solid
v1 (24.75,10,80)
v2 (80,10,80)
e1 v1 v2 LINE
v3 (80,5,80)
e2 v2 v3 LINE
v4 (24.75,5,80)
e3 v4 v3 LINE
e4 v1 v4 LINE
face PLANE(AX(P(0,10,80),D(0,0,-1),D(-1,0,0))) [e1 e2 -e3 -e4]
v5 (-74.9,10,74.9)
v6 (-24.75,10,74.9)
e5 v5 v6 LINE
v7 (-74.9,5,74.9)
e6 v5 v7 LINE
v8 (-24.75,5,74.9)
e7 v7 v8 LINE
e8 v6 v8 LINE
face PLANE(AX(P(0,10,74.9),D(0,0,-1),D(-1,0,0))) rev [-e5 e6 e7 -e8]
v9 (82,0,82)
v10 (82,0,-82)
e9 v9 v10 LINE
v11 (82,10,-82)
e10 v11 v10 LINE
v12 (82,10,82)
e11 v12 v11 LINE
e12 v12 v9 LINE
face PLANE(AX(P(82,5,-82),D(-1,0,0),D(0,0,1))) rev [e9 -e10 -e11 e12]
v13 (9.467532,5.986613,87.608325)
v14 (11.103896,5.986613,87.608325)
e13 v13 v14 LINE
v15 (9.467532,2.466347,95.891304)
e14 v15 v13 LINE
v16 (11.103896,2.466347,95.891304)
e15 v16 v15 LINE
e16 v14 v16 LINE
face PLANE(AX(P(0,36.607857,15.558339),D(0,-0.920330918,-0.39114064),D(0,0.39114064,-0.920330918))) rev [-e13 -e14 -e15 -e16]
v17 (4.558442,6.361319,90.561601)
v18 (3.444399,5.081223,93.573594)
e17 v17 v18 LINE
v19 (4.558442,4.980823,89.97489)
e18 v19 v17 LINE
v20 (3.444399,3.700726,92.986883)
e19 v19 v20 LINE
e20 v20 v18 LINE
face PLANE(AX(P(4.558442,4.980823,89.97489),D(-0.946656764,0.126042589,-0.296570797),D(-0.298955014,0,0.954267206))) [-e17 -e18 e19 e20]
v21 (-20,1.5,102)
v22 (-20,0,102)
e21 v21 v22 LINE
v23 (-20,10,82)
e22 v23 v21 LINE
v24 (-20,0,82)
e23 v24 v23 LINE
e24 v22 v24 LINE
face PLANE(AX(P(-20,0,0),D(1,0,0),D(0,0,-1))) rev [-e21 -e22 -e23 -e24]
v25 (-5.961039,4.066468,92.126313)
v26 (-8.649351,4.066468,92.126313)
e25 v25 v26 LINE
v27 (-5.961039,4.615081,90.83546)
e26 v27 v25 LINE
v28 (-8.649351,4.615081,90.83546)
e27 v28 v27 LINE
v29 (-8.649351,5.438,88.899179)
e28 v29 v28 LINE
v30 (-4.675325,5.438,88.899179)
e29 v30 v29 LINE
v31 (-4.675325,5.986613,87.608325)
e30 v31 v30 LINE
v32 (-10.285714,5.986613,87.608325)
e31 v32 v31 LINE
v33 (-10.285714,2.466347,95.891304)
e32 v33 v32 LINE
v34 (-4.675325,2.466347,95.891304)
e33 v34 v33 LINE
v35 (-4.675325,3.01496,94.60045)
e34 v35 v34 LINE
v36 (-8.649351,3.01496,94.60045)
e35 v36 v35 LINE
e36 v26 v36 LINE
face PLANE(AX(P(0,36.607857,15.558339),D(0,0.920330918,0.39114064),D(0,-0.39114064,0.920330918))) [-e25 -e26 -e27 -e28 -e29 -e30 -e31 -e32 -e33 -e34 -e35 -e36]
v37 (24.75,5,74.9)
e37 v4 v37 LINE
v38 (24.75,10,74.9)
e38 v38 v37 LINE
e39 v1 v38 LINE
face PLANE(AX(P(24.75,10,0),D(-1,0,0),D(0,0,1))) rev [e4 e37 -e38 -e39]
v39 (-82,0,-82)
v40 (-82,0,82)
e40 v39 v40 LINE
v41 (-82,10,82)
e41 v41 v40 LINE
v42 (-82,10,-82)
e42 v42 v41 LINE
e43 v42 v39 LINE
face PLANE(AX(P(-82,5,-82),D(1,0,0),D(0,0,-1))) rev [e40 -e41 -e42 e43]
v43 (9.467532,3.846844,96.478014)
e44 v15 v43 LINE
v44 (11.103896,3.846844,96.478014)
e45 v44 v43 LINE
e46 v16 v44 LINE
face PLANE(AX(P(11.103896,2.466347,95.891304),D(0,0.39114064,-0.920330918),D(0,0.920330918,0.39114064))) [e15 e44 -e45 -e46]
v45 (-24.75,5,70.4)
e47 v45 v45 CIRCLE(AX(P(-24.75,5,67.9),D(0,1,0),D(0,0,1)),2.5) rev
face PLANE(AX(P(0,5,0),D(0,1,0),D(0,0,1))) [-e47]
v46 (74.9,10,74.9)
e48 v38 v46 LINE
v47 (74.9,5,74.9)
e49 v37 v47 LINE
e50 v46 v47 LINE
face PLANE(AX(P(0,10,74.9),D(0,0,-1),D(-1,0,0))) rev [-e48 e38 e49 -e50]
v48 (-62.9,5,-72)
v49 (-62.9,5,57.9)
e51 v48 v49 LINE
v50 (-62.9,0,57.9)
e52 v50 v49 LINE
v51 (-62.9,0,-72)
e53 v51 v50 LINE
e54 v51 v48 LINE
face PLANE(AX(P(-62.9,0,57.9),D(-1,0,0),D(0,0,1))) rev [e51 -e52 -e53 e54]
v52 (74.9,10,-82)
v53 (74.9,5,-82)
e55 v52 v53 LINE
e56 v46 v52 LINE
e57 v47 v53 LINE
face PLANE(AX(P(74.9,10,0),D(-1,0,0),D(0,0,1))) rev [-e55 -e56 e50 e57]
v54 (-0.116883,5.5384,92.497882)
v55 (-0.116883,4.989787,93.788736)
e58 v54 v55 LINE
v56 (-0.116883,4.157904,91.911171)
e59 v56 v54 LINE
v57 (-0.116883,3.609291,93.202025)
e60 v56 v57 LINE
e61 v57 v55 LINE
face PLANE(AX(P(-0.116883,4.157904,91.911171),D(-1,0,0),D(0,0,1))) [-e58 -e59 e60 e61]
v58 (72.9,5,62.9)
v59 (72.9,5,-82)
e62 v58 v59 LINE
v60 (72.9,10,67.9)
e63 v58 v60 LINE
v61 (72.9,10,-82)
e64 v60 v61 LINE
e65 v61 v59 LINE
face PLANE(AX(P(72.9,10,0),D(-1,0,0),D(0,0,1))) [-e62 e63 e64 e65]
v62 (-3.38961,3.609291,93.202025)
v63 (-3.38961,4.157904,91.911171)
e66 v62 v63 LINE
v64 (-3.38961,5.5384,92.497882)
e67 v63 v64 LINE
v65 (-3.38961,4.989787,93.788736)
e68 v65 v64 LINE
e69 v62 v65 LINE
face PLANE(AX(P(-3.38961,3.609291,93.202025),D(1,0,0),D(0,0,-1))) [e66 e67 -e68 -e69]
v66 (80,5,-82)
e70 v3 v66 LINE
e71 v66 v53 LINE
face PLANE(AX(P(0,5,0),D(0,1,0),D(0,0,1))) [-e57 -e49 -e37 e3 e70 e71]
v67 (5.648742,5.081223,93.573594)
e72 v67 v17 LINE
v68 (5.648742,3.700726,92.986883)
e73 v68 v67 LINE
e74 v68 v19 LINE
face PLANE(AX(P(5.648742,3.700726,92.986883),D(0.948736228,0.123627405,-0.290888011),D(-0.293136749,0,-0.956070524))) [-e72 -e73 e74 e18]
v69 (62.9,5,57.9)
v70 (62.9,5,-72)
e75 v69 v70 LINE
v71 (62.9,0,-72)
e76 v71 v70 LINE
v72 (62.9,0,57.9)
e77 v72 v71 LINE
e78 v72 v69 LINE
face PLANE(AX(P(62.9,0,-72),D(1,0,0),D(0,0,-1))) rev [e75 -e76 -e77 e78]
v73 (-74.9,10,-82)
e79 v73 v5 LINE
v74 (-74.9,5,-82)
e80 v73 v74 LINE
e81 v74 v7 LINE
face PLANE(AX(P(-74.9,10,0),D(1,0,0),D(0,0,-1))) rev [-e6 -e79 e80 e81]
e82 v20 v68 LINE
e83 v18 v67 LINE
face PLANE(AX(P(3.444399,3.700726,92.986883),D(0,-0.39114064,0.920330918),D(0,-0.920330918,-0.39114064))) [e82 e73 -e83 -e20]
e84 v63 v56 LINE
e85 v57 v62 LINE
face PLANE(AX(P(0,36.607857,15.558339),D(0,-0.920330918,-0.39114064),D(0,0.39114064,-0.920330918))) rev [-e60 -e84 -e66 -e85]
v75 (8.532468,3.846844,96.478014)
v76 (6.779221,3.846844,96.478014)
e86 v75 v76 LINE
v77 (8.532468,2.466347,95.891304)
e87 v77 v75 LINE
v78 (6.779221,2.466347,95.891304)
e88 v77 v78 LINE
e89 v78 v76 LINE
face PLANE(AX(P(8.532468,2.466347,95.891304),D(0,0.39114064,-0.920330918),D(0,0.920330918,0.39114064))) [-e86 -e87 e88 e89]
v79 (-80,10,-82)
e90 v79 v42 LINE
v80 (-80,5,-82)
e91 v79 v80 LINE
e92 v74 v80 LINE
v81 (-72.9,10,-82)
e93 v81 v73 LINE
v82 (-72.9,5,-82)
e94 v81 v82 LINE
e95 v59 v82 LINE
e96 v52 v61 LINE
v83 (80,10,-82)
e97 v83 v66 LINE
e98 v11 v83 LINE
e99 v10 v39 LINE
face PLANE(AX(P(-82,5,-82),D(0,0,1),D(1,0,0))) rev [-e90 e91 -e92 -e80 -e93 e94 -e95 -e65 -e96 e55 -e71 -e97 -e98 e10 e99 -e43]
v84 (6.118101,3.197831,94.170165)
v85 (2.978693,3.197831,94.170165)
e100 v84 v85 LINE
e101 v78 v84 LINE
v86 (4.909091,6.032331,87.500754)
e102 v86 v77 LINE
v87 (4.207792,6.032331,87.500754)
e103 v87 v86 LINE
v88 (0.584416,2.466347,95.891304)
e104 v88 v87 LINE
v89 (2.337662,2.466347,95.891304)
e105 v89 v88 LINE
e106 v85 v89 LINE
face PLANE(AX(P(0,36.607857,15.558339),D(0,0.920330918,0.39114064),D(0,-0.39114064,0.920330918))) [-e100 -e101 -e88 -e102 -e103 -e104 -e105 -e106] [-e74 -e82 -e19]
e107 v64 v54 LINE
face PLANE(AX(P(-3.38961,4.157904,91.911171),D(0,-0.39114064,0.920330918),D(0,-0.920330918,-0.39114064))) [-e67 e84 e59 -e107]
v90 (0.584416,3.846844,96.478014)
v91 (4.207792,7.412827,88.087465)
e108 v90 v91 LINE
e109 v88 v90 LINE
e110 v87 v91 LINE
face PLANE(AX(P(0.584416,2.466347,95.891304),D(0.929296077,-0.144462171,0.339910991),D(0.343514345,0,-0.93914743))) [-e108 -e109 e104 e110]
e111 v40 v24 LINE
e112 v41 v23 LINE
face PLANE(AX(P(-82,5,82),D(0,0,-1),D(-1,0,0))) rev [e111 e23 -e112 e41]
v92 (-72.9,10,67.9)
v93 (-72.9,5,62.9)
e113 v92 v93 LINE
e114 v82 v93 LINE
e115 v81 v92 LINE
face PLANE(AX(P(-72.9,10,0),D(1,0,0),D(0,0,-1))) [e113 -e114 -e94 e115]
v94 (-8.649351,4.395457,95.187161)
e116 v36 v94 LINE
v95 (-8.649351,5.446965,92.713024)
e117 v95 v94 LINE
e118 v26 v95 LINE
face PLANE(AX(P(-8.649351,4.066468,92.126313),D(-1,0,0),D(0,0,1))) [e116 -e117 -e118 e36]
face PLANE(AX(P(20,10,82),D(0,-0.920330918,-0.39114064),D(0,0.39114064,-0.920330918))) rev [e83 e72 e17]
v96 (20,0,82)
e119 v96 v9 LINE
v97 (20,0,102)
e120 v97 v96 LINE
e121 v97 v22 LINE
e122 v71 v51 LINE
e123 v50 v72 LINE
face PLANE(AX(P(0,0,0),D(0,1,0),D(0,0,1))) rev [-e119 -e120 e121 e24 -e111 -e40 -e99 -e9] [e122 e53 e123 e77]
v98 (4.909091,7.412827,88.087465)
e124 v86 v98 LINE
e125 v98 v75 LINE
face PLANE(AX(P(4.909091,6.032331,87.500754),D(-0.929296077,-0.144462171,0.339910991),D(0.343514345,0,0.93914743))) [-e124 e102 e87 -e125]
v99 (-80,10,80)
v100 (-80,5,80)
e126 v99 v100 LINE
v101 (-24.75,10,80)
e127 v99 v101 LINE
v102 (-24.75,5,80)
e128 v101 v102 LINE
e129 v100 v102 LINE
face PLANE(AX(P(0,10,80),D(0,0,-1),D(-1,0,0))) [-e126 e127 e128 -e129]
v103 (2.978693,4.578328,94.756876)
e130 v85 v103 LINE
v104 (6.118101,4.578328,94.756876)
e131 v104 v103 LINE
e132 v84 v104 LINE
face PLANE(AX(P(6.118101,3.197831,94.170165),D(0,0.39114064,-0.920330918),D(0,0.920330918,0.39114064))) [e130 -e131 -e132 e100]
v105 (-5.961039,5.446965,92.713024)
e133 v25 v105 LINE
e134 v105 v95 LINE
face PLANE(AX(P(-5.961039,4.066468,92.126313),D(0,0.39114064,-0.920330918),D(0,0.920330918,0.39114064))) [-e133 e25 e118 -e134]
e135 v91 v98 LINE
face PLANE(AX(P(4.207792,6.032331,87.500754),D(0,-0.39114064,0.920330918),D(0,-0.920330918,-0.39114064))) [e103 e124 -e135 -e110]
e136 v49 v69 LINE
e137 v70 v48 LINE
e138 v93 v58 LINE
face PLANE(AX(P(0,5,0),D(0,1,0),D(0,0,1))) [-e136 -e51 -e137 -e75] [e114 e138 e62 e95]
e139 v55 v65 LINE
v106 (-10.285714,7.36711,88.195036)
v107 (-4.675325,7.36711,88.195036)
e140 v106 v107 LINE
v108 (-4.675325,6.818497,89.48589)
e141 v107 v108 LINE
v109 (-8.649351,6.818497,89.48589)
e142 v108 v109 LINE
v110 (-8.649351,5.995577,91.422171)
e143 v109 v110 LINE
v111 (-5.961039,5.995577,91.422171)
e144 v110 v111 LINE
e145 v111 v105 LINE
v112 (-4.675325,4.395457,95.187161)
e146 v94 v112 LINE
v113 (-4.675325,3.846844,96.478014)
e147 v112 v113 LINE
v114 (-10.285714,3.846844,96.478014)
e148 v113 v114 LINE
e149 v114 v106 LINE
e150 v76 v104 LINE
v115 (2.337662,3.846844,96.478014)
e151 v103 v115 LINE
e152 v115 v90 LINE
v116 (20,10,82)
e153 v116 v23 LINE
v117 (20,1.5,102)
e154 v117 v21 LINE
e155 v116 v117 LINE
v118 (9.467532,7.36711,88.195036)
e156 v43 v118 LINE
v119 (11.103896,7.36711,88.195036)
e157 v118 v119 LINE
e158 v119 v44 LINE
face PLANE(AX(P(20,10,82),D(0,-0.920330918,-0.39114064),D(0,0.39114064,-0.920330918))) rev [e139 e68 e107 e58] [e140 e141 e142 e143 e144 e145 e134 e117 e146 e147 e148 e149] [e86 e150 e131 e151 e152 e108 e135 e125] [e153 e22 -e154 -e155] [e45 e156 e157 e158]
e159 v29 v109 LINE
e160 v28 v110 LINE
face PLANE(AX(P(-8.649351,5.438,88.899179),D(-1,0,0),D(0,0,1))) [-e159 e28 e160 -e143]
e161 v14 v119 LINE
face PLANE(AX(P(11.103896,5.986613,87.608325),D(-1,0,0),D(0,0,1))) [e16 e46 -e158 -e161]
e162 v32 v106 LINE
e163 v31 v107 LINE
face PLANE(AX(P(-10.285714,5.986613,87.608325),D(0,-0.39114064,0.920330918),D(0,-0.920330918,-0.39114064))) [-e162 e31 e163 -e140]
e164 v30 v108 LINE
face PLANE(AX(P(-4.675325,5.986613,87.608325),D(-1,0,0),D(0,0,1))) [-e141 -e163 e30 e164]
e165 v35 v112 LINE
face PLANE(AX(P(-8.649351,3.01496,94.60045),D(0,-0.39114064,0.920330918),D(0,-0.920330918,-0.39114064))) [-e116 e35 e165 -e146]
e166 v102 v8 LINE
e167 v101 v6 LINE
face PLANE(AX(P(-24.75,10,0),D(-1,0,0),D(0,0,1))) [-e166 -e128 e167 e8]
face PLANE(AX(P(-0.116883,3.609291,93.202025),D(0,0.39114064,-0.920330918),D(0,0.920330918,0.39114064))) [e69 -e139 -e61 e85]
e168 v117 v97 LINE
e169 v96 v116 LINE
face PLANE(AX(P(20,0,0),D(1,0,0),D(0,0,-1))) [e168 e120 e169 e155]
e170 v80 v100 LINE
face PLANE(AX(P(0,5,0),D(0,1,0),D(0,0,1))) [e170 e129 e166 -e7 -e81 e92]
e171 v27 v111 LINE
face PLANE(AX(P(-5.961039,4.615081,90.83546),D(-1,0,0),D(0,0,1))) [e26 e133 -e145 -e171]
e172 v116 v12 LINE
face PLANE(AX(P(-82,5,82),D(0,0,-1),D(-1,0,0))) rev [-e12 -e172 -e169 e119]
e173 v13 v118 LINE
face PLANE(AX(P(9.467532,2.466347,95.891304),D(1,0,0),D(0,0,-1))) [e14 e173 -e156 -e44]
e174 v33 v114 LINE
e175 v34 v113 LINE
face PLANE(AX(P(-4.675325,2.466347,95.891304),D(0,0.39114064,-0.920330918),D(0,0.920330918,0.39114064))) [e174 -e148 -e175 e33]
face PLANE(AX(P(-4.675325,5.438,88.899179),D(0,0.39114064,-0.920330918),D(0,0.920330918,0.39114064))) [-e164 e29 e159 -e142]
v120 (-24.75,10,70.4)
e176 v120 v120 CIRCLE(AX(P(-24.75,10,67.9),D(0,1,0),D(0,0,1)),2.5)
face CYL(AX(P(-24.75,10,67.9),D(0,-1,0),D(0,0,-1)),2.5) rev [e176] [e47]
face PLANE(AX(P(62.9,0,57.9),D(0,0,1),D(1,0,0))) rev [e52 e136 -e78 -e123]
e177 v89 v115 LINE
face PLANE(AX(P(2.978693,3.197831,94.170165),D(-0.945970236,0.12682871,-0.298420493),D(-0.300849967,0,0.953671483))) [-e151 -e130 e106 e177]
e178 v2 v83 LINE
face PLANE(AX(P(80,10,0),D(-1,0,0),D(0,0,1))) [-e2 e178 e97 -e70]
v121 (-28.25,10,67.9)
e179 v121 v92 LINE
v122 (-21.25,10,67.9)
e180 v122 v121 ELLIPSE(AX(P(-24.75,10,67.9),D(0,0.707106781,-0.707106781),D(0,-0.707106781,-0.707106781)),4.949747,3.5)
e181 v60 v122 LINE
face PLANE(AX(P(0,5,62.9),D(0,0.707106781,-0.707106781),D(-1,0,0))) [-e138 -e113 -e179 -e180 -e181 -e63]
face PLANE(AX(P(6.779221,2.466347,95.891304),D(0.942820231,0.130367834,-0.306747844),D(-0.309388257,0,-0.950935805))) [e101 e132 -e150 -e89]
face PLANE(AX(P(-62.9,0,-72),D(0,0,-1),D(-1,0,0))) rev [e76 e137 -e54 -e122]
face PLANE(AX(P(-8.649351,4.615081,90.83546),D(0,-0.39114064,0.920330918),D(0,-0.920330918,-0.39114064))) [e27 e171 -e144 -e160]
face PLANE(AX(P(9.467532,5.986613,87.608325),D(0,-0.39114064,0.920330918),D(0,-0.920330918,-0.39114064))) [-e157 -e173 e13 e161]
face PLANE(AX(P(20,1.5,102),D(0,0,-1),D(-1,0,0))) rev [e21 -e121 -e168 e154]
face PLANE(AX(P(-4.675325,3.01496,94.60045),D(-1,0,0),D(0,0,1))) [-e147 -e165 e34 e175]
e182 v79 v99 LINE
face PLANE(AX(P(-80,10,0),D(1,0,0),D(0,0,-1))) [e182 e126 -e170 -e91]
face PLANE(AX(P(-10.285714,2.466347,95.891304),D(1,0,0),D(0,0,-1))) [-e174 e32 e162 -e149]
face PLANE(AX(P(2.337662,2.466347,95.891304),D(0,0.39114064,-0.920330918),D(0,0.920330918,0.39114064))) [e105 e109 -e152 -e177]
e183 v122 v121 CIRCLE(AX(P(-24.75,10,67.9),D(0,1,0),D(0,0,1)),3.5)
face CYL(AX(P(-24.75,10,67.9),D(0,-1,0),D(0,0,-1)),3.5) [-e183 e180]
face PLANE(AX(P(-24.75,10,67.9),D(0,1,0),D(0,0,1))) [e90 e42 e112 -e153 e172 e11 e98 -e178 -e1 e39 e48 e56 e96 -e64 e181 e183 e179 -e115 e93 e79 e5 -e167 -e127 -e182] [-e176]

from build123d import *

# Parameters (mm, degrees)
SKETCH1_W           = 164
SKETCH1_H           = 164
BOSS_EXTRUDE1_DEPTH = 5
BOSS_EXTRUDE2_DEPTH = 5
SKETCH3_R           = 3.5
SKETCH3_R_2         = 2.5
BOSS_EXTRUDE3_DEPTH = 5
SKETCH5_W           = 125.8
SKETCH5_H           = 129.9
CUT_EXTRUDE1_DEPTH  = 117.073252733
CHAMFER2_SIZE       = 10
BOSS_EXTRUDE4_DEPTH = 20
SKETCH7_W           = 3.272727273
SKETCH7_H           = 1.402597403
SKETCH7_W_2         = 1.636363636
SKETCH7_H_2         = 9
CUT_EXTRUDE3_DEPTH  = 1.5


with BuildPart() as part:
    # Sketch1 → Boss-Extrude1 (new body)
    with BuildSketch(Plane(origin=(0, 0, 0), x_dir=(1, 0, 0), z_dir=(0, 1, 0))):
        Rectangle(SKETCH1_W, SKETCH1_H)
    extrude(amount=BOSS_EXTRUDE1_DEPTH)

    # Sketch2 → Boss-Extrude2 (add)
    with BuildSketch(Plane(origin=(0, 5, 0), x_dir=(1, 0, 0), z_dir=(0, 1, 0))):
        Polygon((-80, -80), (-80, 82), (-82, 82), (-82, -82), (82, -82), (82, 82), (80, 82), (80, -80), (24.75, -80), (24.75, -74.9), (74.9, -74.9), (74.9, 82), (72.9, 82), (72.9, -72.9), (-72.9, -72.9), (-72.9, 82), (-74.9, 82), (-74.9, -74.9), (-24.75, -74.9), (-24.75, -80), align=None)
    extrude(amount=BOSS_EXTRUDE2_DEPTH)

    # Sketch3 → Boss-Extrude3 (add)
    with BuildSketch(Plane(origin=(0, 5, 0), x_dir=(1, 0, 0), z_dir=(0, 1, 0))):
        with Locations(Location((-24.75, -67.9, 0), (0, 0, 270))):
            Circle(SKETCH3_R)
        with Locations(Location((-24.75, -67.9, 0), (0, 0, 270))):
            Circle(SKETCH3_R_2, mode=Mode.SUBTRACT)
    extrude(amount=BOSS_EXTRUDE3_DEPTH)

    # Sketch5 → Cut-Extrude1 (cut, through all)
    with BuildSketch(Plane(origin=(0, 5, 0), x_dir=(1, 0, 0), z_dir=(0, 1, 0))):
        with Locations((0, 7.05)):
            Rectangle(SKETCH5_W, SKETCH5_H)
    extrude(amount=-CUT_EXTRUDE1_DEPTH, mode=Mode.SUBTRACT)

    # Chamfer2
    # the kernel refuses this chamfer: 10 mm, written as the material it adds along each edge
    with BuildSketch(Plane(origin=(98.61682988, 5, 72.9), x_dir=(0, -0.027495876610586403, -0.9996219169112968), z_dir=(-1, 0, 0))) as chamfer2_piece_1_section:
        Polygon((CHAMFER2_SIZE * 0.999621916911, -CHAMFER2_SIZE * 0.0274958766106), (-CHAMFER2_SIZE * 0.0274958766106, -CHAMFER2_SIZE * 0.999621916911), (0, 0), align=None)
    chamfer2_piece_1 = extrude(amount=171.51682988, mode=Mode.PRIVATE)
    chamfer2_piece_1 = split(chamfer2_piece_1, bisect_by=Plane(origin=(0.76457013, 10, 69.034324166), z_dir=(0, -1, 0)), keep=Keep.TOP, mode=Mode.PRIVATE)
    chamfer2_piece_1 = split(chamfer2_piece_1, bisect_by=Plane(origin=(74.9, 7.221559046, 69.034324166), z_dir=(-1, 0, 0)), keep=Keep.TOP, mode=Mode.PRIVATE)
    chamfer2_piece_1 = chamfer2_piece_1 - Plane(origin=(-24.75, 7.221559046, 67.9), x_dir=(0, 0, 1), z_dir=(0, -1, 0)) * Cylinder(2.5, 384, mode=Mode.PRIVATE)
    add(chamfer2_piece_1)

    # Sketch6 → Boss-Extrude4 (add, symmetric)
    with BuildSketch(Plane(origin=(0, 0, 0), x_dir=(0, 0, -1), z_dir=(1, 0, 0))):
        Polygon((-82, 0), (-82, 10), (-102, 1.5), (-102, 0), align=None)
    extrude(amount=BOSS_EXTRUDE4_DEPTH, both=True)

    # Sketch7 → Cut-Extrude3 (cut)
    # profile 1 of 4: a face of its own
    with BuildSketch(Plane(origin=(0, -16.938205466, 145.38401286), x_dir=(1, 0, 0), z_dir=(0, -0.9203309184584746, -0.39114064034485163))):
        Polygon((-8.649350649, -60.736982492), (-8.649350649, -58.633086388), (-5.961038961, -58.633086388), (-5.961038961, -57.230488986), (-8.649350649, -57.230488986), (-8.649350649, -54.542177297), (-4.675324675, -54.542177297), (-4.675324675, -53.139579895), (-10.285714286, -53.139579895), (-10.285714286, -62.139579895), (-4.675324675, -62.139579895), (-4.675324675, -60.736982492), align=None)
    # profile 2 of 4: a face of its own
    with BuildSketch(Plane(origin=(0, -16.938205466, 145.38401286), x_dir=(1, 0, 0), z_dir=(0, -0.9203309184584746, -0.39114064034485163))):
        with Locations((-1.753246754, -56.762956519)):
            Rectangle(SKETCH7_W, SKETCH7_H)
    # profile 3 of 4: a face of its own
    with BuildSketch(Plane(origin=(0, -16.938205466, 145.38401286), x_dir=(1, 0, 0), z_dir=(0, -0.9203309184584746, -0.39114064034485163))):
        Polygon((6.779220779, -53.139579895), (6.118100649, -55.009709765), (2.978693182, -55.009709765), (2.337662338, -53.139579895), (0.584415584, -53.139579895), (4.207792208, -62.256463012), (4.909090909, -62.256463012), (8.532467532, -53.139579895), align=None)
        Polygon((4.558441558, -59.568151323), (3.444399351, -56.295424051), (5.648741883, -56.295424051), align=None, mode=Mode.SUBTRACT)
    # profile 4 of 4: a face of its own
    with BuildSketch(Plane(origin=(0, -16.938205466, 145.38401286), x_dir=(1, 0, 0), z_dir=(0, -0.9203309184584746, -0.39114064034485163))):
        with Locations((10.285714286, -57.639579895)):
            Rectangle(SKETCH7_W_2, SKETCH7_H_2)
    extrude(amount=CUT_EXTRUDE3_DEPTH, mode=Mode.SUBTRACT)


solid = part.part
